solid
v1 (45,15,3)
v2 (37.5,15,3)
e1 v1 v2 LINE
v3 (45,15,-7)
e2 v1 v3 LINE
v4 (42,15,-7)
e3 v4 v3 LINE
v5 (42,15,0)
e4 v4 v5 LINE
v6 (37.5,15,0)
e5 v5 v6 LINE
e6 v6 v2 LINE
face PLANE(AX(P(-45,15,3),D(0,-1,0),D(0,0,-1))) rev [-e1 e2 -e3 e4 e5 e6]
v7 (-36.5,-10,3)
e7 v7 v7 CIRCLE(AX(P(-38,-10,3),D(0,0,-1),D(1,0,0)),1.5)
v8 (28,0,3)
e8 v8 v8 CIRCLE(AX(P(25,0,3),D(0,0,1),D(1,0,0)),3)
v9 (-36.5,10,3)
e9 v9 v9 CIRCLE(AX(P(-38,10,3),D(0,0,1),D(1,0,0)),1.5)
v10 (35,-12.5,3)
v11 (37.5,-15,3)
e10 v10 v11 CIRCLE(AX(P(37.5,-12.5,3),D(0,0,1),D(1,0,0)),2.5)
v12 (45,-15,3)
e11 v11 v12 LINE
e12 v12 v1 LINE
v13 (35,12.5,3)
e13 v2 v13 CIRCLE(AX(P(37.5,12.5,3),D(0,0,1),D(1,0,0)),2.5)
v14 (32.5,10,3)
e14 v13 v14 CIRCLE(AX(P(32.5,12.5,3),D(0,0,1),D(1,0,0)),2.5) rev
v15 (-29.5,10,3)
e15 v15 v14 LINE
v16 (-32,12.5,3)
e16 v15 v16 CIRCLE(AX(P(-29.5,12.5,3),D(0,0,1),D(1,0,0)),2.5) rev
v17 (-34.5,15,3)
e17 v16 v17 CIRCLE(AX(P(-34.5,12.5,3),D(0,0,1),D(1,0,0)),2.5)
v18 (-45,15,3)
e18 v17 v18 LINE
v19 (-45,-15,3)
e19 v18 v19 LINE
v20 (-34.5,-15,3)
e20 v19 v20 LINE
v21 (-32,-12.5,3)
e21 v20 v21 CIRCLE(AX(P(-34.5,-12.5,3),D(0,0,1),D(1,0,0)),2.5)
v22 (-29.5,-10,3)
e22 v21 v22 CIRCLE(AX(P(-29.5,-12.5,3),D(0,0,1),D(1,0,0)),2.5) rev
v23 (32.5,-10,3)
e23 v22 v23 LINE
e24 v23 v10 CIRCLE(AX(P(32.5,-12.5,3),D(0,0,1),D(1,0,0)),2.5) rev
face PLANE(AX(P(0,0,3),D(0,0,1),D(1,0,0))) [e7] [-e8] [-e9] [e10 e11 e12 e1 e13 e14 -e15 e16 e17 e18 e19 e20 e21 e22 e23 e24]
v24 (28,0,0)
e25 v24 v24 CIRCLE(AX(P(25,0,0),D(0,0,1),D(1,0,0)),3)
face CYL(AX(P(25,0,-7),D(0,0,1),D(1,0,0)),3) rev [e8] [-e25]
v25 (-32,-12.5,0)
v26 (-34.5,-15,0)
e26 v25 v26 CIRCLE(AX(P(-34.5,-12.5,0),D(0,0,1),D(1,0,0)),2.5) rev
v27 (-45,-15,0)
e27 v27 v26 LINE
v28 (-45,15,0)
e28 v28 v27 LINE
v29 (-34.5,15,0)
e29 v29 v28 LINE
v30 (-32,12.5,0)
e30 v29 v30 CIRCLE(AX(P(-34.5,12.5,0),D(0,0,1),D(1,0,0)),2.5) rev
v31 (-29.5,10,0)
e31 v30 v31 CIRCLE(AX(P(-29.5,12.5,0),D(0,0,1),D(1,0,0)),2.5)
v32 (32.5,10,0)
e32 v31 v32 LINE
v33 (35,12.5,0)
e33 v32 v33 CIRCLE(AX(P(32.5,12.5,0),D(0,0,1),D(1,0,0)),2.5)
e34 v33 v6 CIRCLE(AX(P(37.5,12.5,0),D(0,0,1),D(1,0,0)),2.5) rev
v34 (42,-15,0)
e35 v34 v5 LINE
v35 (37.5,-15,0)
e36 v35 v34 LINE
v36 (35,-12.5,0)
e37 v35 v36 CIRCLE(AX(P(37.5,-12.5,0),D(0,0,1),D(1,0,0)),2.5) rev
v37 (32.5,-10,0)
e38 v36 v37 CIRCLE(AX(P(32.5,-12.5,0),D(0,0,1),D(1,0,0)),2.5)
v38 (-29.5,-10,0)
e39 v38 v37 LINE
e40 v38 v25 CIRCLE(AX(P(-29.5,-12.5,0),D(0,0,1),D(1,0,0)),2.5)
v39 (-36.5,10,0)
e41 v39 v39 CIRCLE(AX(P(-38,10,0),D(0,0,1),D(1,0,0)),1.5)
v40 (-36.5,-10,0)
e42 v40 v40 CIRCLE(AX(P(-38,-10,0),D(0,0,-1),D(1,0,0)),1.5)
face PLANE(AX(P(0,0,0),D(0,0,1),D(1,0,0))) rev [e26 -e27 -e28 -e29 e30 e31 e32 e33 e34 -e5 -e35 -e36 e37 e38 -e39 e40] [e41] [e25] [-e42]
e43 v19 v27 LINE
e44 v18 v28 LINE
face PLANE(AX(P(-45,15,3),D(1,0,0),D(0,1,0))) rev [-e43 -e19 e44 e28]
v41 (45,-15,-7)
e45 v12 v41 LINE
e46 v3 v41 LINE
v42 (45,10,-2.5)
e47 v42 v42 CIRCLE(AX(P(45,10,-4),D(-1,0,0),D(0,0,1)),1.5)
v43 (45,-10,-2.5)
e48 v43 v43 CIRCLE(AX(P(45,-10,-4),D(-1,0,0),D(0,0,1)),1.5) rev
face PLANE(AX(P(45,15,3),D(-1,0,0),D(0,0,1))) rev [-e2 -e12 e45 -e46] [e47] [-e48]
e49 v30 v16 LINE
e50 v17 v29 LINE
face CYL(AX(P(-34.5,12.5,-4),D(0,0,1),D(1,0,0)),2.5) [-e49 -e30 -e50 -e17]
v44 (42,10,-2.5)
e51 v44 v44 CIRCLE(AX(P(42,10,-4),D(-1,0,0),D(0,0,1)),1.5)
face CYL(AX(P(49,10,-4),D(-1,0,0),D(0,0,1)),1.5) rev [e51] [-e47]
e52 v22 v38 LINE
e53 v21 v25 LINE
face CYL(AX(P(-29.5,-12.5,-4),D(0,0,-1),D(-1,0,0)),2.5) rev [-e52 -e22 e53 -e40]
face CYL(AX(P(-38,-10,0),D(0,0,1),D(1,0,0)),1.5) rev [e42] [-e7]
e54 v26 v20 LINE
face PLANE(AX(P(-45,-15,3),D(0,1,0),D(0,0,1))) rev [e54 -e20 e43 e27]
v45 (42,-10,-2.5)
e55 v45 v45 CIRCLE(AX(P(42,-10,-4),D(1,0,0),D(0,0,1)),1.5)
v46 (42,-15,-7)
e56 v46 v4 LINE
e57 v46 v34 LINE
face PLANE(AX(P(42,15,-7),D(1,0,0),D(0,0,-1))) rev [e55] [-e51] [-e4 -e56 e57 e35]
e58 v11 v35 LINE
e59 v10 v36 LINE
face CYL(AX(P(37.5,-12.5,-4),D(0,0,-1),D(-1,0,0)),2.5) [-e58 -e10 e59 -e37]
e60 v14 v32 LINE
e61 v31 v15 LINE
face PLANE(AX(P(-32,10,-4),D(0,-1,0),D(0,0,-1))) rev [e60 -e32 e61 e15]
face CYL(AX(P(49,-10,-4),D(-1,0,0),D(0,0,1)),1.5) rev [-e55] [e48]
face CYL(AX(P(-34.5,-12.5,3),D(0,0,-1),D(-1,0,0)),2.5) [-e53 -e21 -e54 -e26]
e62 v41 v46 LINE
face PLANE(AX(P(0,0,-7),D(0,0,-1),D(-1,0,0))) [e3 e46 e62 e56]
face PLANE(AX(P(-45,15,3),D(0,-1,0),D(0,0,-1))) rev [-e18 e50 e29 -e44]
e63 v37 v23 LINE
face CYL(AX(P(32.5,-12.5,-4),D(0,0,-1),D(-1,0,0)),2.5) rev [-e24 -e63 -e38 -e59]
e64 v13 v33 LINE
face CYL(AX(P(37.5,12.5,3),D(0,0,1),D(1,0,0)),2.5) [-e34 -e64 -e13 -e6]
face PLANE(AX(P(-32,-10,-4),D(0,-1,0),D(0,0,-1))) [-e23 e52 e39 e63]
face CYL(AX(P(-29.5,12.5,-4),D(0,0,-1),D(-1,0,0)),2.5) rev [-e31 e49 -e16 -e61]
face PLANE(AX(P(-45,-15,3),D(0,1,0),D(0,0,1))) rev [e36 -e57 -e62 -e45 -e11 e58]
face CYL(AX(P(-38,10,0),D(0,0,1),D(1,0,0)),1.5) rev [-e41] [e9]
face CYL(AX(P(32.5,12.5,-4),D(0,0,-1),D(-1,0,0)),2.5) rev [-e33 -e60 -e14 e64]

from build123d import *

# Parameters (mm, degrees)
SKETCH1_W           = 90
SKETCH1_H           = 30
BOSS_EXTRUDE1_DEPTH = 3
SKETCH2_R           = 1.5
CUT_EXTRUDE1_DEPTH  = 3
SKETCH3_W           = 3
SKETCH3_H           = 30
BOSS_EXTRUDE2_DEPTH = 7
SKETCH4_R           = 1.5
CUT_EXTRUDE2_DEPTH  = 7
SKETCH5_W           = 67
SKETCH5_H           = 5
CUT_EXTRUDE3_DEPTH  = 7
FILLET1_START       = -7
FILLET1_DEPTH       = 11
FILLET1_2_DEPTH     = 3
SKETCH6_R           = 3
CUT_EXTRUDE4_DEPTH  = 10


with BuildPart() as part:
    # Sketch1 → Boss-Extrude1 (new body)
    with BuildSketch(Plane.XY):
        Rectangle(SKETCH1_W, SKETCH1_H)
    extrude(amount=BOSS_EXTRUDE1_DEPTH)

    # Sketch2 → Cut-Extrude1 (cut)
    with BuildSketch(Plane.XY.offset(3)):
        with Locations((-38, 10)):
            Circle(SKETCH2_R)
    cut_extrude1 = extrude(amount=-CUT_EXTRUDE1_DEPTH, mode=Mode.SUBTRACT)

    # Sketch3 → Boss-Extrude2 (add)
    with BuildSketch(Plane(origin=(0, 0, 0), x_dir=(-1, 0, 0), z_dir=(0, 0, -1))):
        with Locations((-43.5, 0)):
            Rectangle(SKETCH3_W, SKETCH3_H)
    extrude(amount=BOSS_EXTRUDE2_DEPTH)

    # Sketch4 → Cut-Extrude2 (cut)
    with BuildSketch(Plane.ZY.offset(-42)):
        with Locations((-4, 10)):
            Circle(SKETCH4_R)
    cut_extrude2 = extrude(amount=-CUT_EXTRUDE2_DEPTH, mode=Mode.SUBTRACT)

    # Sketch5 → Cut-Extrude3 (cut)
    with BuildSketch(Plane.XY.offset(3)):
        with Locations((1.5, 12.5)):
            Rectangle(SKETCH5_W, SKETCH5_H)
    cut_extrude3 = extrude(amount=-CUT_EXTRUDE3_DEPTH, mode=Mode.SUBTRACT)

    # Mirror1: Cut-Extrude1, Cut-Extrude2, Cut-Extrude3 across plane
    add(cut_extrude1.mirror(Plane.ZX), mode=Mode.SUBTRACT)
    add(cut_extrude2.mirror(Plane.ZX), mode=Mode.SUBTRACT)
    add(cut_extrude3.mirror(Plane.ZX), mode=Mode.SUBTRACT)

    # Fillet1: read off the stored shape, not the designer's step
    # Fillet1 outline → Fillet1 (cut)
    with BuildSketch(Plane.XY.offset(FILLET1_START)):
        with BuildLine():
            Line((-32, -15), (-32, -12.5))
            ThreePointArc((-32, -12.5), (-32.732233047, -14.267766953), (-34.5, -15))
            Line((-34.5, -15), (-32, -15))
        make_face()
        with BuildLine():
            ThreePointArc((37.5, -15), (35.732233047, -14.267766953), (35, -12.5))
            Line((35, -12.5), (35, -15))
            Line((35, -15), (37.5, -15))
        make_face()
        with BuildLine():
            ThreePointArc((-34.5, 15), (-32.732233047, 14.267766953), (-32, 12.5))
            Line((-32, 12.5), (-32, 15))
            Line((-32, 15), (-34.5, 15))
        make_face()
        with BuildLine():
            ThreePointArc((35, 12.5), (35.732233047, 14.267766953), (37.5, 15))
            Line((37.5, 15), (35, 15))
            Line((35, 15), (35, 12.5))
        make_face()
    extrude(amount=FILLET1_DEPTH, mode=Mode.SUBTRACT)

    # Fillet1 2 outline → Fillet1 2 (add)
    with BuildSketch(Plane.XY):
        with BuildLine():
            Line((35, -10), (32.5, -10))
            ThreePointArc((32.5, -10), (34.267766953, -10.732233047), (35, -12.5))
            Line((35, -12.5), (35, -10))
        make_face()
        with BuildLine():
            ThreePointArc((-32, -12.5), (-31.267766953, -10.732233047), (-29.5, -10))
            Line((-29.5, -10), (-32, -10))
            Line((-32, -10), (-32, -12.5))
        make_face()
        with BuildLine():
            Line((-32, 10), (-29.5, 10))
            ThreePointArc((-29.5, 10), (-31.267766953, 10.732233047), (-32, 12.5))
            Line((-32, 12.5), (-32, 10))
        make_face()
        with BuildLine():
            Line((35, 10), (35, 12.5))
            ThreePointArc((35, 12.5), (34.267766953, 10.732233047), (32.5, 10))
            Line((32.5, 10), (35, 10))
        make_face()
    extrude(amount=FILLET1_2_DEPTH)

    # Sketch6 → Cut-Extrude4 (cut)
    with BuildSketch(Plane.XY.offset(3)):
        with Locations((25, 0)):
            Circle(SKETCH6_R)
    extrude(amount=-CUT_EXTRUDE4_DEPTH, mode=Mode.SUBTRACT)


solid = part.part
